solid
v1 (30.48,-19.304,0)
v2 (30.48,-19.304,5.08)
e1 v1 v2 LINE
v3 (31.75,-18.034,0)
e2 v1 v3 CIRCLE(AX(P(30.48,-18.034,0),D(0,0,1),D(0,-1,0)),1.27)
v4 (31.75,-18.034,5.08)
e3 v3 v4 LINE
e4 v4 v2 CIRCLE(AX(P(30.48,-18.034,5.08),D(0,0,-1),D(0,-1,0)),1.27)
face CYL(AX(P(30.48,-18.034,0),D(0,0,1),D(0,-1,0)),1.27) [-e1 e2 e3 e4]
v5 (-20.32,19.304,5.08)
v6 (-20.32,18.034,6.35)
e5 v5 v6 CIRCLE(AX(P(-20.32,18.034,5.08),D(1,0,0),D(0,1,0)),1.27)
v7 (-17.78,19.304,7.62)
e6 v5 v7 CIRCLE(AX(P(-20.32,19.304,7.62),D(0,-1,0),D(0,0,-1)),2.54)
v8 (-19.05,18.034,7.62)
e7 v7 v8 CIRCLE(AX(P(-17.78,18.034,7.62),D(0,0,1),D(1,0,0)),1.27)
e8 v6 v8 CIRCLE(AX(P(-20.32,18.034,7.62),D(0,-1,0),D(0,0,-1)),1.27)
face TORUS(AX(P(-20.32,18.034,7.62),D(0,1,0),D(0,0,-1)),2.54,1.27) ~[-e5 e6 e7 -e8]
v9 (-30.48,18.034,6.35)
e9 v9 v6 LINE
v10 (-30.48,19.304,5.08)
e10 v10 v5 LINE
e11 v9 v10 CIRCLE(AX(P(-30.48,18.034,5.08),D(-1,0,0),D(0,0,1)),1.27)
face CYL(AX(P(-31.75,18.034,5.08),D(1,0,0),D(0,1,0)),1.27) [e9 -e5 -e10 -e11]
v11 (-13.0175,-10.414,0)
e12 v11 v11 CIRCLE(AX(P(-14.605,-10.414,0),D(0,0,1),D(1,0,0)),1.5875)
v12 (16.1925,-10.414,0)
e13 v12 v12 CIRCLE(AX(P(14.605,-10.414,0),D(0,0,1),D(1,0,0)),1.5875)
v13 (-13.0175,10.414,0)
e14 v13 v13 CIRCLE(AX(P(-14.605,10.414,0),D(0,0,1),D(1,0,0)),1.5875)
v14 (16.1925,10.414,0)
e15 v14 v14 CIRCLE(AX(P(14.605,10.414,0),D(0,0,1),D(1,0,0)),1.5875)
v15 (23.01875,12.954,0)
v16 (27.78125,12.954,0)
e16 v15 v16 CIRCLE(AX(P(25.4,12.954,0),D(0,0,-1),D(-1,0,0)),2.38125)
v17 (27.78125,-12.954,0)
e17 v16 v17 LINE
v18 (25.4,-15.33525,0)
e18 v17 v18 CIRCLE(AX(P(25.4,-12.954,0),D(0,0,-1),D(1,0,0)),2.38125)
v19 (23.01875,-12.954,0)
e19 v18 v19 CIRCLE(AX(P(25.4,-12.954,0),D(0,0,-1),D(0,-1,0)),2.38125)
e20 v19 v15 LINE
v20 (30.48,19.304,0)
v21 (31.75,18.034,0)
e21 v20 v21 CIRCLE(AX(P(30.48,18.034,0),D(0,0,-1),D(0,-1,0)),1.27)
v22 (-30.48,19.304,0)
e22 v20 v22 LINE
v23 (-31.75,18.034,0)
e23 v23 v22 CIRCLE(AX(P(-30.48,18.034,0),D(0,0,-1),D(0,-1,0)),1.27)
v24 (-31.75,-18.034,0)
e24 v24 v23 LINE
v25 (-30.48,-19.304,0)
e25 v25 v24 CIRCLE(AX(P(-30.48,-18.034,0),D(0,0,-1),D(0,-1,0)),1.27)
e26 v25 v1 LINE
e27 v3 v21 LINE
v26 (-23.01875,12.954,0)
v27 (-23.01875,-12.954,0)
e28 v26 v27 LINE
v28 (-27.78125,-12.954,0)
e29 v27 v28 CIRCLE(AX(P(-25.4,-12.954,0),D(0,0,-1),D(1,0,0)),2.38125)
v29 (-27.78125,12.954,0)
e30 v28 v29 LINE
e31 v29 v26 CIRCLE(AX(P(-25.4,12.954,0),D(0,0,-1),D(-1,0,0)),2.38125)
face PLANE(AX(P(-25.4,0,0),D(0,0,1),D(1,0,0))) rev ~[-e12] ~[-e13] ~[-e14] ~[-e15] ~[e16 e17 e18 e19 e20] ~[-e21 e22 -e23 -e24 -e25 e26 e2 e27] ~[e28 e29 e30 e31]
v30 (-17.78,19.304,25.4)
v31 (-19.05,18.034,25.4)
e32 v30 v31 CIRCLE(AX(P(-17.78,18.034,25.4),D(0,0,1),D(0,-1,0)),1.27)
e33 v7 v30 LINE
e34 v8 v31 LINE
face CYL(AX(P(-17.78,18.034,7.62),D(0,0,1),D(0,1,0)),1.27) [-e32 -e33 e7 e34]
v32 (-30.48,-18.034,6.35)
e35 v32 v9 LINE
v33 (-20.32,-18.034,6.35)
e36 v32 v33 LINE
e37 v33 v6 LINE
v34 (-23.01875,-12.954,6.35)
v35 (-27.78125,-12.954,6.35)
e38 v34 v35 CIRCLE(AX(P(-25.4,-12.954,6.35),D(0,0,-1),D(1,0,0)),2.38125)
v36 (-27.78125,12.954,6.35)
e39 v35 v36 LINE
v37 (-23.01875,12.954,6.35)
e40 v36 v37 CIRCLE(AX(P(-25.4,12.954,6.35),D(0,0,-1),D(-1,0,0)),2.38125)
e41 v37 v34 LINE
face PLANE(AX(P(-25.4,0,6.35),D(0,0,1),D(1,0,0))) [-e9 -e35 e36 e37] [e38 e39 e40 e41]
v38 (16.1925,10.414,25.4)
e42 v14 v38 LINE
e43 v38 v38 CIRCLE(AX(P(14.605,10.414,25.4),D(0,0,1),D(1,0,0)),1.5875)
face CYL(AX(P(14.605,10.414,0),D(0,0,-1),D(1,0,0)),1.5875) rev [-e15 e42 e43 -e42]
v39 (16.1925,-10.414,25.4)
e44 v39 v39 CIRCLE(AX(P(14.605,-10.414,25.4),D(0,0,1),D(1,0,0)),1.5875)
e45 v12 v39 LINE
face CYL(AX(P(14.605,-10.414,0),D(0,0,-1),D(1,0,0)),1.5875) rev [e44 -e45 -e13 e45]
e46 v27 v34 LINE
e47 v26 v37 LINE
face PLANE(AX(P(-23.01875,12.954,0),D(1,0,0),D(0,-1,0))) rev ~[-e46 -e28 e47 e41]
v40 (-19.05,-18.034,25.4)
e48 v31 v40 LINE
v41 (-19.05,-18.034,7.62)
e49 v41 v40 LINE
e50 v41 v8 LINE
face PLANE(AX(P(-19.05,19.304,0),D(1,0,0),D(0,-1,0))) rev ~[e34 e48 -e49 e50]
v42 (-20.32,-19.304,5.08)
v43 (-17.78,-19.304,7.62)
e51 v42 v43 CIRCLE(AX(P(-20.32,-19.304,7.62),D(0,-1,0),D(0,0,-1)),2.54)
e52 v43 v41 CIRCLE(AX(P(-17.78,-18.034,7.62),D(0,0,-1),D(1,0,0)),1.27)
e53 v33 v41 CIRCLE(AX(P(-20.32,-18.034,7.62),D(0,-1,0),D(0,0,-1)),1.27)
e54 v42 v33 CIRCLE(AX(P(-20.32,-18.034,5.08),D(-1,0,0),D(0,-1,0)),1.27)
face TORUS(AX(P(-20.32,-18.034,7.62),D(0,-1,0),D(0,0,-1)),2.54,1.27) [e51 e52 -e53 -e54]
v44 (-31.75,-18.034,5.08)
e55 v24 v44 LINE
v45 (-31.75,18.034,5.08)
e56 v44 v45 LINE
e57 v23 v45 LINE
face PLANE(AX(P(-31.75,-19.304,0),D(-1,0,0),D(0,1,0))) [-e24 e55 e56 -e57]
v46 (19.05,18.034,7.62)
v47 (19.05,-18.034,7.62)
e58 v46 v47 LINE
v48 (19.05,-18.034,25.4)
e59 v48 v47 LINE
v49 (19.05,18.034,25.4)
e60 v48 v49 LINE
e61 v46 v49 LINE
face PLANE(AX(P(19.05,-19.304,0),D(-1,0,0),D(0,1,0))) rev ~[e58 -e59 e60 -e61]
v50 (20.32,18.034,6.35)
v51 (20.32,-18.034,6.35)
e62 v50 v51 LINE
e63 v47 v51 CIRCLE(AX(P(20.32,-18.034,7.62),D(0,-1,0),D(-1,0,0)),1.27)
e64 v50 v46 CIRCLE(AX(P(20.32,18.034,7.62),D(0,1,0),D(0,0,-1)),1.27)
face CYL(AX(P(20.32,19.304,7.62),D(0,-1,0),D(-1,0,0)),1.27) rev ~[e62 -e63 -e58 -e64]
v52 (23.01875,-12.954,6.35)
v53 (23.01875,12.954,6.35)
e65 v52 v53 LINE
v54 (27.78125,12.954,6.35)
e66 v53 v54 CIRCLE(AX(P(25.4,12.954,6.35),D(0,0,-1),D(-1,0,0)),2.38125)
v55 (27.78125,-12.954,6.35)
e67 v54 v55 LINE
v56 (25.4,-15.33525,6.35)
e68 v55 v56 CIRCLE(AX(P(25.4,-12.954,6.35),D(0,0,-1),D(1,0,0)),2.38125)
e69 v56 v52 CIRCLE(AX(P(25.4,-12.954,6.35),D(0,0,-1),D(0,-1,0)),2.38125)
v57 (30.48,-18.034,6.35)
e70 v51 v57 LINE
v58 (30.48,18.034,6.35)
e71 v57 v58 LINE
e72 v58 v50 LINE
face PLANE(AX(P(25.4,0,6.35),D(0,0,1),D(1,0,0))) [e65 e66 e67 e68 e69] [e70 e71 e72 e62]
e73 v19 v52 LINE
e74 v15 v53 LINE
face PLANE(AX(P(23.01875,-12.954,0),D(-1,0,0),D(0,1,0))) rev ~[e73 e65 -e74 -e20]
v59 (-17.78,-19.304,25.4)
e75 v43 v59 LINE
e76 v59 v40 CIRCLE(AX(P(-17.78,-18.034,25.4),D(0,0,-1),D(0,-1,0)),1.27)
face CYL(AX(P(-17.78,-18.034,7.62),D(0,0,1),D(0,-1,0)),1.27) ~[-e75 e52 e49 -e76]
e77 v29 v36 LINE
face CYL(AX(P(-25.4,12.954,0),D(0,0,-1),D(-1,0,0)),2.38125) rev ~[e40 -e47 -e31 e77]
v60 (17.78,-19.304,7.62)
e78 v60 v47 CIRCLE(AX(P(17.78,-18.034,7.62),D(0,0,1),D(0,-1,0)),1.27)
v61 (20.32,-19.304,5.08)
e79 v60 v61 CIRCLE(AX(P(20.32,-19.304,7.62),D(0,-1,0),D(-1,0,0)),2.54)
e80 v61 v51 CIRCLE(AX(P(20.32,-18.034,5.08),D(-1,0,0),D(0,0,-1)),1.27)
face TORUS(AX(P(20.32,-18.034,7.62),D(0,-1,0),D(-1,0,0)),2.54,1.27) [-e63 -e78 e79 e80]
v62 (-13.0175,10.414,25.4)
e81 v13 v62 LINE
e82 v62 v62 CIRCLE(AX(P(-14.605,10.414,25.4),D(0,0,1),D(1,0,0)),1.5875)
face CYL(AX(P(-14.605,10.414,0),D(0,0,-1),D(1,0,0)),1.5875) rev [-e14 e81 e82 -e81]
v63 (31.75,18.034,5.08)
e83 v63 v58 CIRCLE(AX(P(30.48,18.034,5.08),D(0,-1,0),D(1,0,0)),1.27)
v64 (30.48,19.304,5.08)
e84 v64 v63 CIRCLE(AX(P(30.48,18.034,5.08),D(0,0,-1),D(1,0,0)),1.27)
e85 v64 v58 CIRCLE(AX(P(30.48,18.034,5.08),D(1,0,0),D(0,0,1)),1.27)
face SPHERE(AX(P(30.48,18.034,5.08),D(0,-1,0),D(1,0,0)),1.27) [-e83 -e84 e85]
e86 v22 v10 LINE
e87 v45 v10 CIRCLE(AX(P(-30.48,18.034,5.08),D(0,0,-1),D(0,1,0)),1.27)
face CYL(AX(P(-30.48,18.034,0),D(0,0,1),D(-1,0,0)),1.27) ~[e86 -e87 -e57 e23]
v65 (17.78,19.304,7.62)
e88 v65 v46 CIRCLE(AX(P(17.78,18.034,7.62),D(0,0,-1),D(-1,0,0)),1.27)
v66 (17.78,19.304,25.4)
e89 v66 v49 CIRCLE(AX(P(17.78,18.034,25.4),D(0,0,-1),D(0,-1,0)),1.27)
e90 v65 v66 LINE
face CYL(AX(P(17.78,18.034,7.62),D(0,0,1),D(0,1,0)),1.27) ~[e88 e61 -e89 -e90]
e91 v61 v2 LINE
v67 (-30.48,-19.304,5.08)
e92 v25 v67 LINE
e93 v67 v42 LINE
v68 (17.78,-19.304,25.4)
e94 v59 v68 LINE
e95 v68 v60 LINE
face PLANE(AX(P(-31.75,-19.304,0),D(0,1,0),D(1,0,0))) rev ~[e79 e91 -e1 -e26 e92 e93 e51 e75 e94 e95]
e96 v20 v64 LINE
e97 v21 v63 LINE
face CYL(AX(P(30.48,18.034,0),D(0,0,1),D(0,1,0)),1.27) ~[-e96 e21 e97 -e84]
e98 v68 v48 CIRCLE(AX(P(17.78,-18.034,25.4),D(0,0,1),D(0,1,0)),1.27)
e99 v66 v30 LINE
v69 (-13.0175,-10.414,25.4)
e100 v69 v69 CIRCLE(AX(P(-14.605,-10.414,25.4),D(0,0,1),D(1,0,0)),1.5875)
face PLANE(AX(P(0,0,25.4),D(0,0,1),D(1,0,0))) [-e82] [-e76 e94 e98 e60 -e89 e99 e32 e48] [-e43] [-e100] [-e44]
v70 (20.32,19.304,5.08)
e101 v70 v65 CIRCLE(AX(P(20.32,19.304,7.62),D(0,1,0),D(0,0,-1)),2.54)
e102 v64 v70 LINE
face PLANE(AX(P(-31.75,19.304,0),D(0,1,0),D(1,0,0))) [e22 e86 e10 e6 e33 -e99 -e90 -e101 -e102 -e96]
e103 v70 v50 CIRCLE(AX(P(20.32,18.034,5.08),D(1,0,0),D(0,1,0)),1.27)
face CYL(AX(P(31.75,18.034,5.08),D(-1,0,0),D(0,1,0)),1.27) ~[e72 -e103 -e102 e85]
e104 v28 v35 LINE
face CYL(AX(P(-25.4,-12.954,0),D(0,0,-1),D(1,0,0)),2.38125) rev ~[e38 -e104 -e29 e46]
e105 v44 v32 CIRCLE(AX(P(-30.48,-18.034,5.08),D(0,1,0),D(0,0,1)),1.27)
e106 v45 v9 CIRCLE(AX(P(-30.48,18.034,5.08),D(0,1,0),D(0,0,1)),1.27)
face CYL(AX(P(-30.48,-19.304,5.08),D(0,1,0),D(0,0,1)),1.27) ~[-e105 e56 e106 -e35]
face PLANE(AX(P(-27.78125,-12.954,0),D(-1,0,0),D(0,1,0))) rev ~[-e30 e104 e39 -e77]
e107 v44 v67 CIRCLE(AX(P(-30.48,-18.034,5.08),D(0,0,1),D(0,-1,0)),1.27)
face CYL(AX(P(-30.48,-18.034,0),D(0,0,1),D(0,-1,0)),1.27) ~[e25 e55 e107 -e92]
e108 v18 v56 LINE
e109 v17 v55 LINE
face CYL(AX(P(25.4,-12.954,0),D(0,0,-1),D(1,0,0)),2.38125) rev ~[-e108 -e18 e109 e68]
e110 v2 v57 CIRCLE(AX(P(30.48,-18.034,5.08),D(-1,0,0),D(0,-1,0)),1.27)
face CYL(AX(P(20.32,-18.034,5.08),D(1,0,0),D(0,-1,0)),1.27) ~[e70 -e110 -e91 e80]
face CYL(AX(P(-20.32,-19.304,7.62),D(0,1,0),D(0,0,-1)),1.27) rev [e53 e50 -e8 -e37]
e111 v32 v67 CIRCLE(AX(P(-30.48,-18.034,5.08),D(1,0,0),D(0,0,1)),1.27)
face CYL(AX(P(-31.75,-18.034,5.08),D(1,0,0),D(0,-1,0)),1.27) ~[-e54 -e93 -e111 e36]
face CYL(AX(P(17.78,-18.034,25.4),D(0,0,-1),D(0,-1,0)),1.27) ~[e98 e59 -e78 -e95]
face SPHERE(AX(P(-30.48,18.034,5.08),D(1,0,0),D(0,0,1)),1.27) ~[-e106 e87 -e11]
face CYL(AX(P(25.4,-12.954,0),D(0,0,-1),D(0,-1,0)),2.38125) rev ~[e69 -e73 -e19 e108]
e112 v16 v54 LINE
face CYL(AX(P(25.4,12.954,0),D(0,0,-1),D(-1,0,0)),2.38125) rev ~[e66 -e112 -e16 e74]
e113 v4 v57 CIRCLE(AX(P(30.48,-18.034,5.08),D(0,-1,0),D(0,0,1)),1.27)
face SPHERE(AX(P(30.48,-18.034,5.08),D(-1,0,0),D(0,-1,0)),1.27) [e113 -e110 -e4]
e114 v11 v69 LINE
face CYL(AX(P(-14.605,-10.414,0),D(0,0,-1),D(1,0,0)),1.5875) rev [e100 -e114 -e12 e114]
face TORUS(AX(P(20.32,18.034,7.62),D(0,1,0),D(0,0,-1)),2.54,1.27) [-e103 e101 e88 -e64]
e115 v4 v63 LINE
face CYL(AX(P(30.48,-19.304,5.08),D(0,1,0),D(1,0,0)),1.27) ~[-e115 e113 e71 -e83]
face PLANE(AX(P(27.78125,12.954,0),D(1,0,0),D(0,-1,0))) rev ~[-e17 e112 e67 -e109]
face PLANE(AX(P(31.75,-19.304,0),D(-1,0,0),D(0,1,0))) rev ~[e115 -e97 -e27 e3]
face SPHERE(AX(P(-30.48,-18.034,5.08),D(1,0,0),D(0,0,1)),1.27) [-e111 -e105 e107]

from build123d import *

# Parameters (mm, degrees)
F0_R     = 1.5875
F1_DEPTH = 25.4
F0_W     = 12.7
F0_H     = 38.608
F2_DEPTH = 6.35
F3_F1_R  = 1.27
F3_F2_R  = 1.27


with BuildPart() as f1:
    # F0 (on Top) → F1 (new body)
    with BuildSketch(Plane.XY):
        Polygon((19.05, 0), (19.05, 19.304), (-19.05, 19.304), (-19.05, -19.304), (19.05, -19.304), align=None)
        with Locations((-14.605, -10.414)):
            Circle(F0_R, mode=Mode.SUBTRACT)
        with Locations((14.605, -10.414)):
            Circle(F0_R, mode=Mode.SUBTRACT)
        with Locations((-14.605, 10.414)):
            Circle(F0_R, mode=Mode.SUBTRACT)
        with Locations((14.605, 10.414)):
            Circle(F0_R, mode=Mode.SUBTRACT)
    extrude(amount=F1_DEPTH)

    # F0 (on Top) → F2 (join)
    with BuildSketch(Plane.XY):
        with Locations((-25.4, 0)):
            Rectangle(F0_W, F0_H)
        with BuildLine():
            ThreePointArc((-27.78125, 12.954), (-25.4, 15.33525), (-23.01875, 12.954))
            Line((-23.01875, 12.954), (-23.01875, -12.954))
            ThreePointArc((-23.01875, -12.954), (-25.4, -15.33525), (-27.78125, -12.954))
            Line((-27.78125, -12.954), (-27.78125, 12.954))
        make_face(mode=Mode.SUBTRACT)
        Polygon((31.75, 19.304), (19.05, 19.304), (19.05, 0), (19.05, -19.304), (25.4, -19.304), (31.75, -19.304), align=None)
        with BuildLine():
            ThreePointArc((27.78125, -12.954), (27.0837980227, -14.6377980227), (25.4, -15.33525))
            ThreePointArc((25.4, -15.33525), (23.7162019773, -14.6377980227), (23.01875, -12.954))
            Line((23.01875, -12.954), (23.01875, 12.954))
            ThreePointArc((23.01875, 12.954), (25.4, 15.33525), (27.78125, 12.954))
            Line((27.78125, 12.954), (27.78125, -12.954))
        make_face(mode=Mode.SUBTRACT)
    extrude(amount=F2_DEPTH)

    # F3: fillet of radius 1.27 on 13 edges, made by hand

    # F3_f1
    f3_f1_edges = [f1.edges().sort_by_distance(p)[0] for p in [
        (-19.05, 0, 6.35),
        (19.05, 0, 6.35),
    ]]
    fillet(f3_f1_edges, radius=F3_F1_R)

    # F3_f2
    f3_f2_edges = [f1.edges().sort_by_distance(p)[0] for p in [
        (-19.05, -19.304, 16.51),
        (-19.05, 19.304, 16.51),
        (-31.75, 0, 6.35),
        (-31.75, -19.304, 3.175),
        (-31.75, 19.304, 3.175),
        (26.035, -19.304, 6.35),
        (19.05, -19.304, 16.51),
        (31.75, -19.304, 3.175),
        (31.75, 0, 6.35),
        (31.75, 19.304, 3.175),
        (26.035, 19.304, 6.35),
        (19.4219743879, 19.304, 6.7219743879),
        (19.4219743879, -19.304, 6.7219743879),
        (-19.4219743879, 19.304, 6.7219743879),
        (-19.4219743879, -19.304, 6.7219743879),
    ]]
    fillet(f3_f2_edges, radius=F3_F2_R)


solid = f1.part
